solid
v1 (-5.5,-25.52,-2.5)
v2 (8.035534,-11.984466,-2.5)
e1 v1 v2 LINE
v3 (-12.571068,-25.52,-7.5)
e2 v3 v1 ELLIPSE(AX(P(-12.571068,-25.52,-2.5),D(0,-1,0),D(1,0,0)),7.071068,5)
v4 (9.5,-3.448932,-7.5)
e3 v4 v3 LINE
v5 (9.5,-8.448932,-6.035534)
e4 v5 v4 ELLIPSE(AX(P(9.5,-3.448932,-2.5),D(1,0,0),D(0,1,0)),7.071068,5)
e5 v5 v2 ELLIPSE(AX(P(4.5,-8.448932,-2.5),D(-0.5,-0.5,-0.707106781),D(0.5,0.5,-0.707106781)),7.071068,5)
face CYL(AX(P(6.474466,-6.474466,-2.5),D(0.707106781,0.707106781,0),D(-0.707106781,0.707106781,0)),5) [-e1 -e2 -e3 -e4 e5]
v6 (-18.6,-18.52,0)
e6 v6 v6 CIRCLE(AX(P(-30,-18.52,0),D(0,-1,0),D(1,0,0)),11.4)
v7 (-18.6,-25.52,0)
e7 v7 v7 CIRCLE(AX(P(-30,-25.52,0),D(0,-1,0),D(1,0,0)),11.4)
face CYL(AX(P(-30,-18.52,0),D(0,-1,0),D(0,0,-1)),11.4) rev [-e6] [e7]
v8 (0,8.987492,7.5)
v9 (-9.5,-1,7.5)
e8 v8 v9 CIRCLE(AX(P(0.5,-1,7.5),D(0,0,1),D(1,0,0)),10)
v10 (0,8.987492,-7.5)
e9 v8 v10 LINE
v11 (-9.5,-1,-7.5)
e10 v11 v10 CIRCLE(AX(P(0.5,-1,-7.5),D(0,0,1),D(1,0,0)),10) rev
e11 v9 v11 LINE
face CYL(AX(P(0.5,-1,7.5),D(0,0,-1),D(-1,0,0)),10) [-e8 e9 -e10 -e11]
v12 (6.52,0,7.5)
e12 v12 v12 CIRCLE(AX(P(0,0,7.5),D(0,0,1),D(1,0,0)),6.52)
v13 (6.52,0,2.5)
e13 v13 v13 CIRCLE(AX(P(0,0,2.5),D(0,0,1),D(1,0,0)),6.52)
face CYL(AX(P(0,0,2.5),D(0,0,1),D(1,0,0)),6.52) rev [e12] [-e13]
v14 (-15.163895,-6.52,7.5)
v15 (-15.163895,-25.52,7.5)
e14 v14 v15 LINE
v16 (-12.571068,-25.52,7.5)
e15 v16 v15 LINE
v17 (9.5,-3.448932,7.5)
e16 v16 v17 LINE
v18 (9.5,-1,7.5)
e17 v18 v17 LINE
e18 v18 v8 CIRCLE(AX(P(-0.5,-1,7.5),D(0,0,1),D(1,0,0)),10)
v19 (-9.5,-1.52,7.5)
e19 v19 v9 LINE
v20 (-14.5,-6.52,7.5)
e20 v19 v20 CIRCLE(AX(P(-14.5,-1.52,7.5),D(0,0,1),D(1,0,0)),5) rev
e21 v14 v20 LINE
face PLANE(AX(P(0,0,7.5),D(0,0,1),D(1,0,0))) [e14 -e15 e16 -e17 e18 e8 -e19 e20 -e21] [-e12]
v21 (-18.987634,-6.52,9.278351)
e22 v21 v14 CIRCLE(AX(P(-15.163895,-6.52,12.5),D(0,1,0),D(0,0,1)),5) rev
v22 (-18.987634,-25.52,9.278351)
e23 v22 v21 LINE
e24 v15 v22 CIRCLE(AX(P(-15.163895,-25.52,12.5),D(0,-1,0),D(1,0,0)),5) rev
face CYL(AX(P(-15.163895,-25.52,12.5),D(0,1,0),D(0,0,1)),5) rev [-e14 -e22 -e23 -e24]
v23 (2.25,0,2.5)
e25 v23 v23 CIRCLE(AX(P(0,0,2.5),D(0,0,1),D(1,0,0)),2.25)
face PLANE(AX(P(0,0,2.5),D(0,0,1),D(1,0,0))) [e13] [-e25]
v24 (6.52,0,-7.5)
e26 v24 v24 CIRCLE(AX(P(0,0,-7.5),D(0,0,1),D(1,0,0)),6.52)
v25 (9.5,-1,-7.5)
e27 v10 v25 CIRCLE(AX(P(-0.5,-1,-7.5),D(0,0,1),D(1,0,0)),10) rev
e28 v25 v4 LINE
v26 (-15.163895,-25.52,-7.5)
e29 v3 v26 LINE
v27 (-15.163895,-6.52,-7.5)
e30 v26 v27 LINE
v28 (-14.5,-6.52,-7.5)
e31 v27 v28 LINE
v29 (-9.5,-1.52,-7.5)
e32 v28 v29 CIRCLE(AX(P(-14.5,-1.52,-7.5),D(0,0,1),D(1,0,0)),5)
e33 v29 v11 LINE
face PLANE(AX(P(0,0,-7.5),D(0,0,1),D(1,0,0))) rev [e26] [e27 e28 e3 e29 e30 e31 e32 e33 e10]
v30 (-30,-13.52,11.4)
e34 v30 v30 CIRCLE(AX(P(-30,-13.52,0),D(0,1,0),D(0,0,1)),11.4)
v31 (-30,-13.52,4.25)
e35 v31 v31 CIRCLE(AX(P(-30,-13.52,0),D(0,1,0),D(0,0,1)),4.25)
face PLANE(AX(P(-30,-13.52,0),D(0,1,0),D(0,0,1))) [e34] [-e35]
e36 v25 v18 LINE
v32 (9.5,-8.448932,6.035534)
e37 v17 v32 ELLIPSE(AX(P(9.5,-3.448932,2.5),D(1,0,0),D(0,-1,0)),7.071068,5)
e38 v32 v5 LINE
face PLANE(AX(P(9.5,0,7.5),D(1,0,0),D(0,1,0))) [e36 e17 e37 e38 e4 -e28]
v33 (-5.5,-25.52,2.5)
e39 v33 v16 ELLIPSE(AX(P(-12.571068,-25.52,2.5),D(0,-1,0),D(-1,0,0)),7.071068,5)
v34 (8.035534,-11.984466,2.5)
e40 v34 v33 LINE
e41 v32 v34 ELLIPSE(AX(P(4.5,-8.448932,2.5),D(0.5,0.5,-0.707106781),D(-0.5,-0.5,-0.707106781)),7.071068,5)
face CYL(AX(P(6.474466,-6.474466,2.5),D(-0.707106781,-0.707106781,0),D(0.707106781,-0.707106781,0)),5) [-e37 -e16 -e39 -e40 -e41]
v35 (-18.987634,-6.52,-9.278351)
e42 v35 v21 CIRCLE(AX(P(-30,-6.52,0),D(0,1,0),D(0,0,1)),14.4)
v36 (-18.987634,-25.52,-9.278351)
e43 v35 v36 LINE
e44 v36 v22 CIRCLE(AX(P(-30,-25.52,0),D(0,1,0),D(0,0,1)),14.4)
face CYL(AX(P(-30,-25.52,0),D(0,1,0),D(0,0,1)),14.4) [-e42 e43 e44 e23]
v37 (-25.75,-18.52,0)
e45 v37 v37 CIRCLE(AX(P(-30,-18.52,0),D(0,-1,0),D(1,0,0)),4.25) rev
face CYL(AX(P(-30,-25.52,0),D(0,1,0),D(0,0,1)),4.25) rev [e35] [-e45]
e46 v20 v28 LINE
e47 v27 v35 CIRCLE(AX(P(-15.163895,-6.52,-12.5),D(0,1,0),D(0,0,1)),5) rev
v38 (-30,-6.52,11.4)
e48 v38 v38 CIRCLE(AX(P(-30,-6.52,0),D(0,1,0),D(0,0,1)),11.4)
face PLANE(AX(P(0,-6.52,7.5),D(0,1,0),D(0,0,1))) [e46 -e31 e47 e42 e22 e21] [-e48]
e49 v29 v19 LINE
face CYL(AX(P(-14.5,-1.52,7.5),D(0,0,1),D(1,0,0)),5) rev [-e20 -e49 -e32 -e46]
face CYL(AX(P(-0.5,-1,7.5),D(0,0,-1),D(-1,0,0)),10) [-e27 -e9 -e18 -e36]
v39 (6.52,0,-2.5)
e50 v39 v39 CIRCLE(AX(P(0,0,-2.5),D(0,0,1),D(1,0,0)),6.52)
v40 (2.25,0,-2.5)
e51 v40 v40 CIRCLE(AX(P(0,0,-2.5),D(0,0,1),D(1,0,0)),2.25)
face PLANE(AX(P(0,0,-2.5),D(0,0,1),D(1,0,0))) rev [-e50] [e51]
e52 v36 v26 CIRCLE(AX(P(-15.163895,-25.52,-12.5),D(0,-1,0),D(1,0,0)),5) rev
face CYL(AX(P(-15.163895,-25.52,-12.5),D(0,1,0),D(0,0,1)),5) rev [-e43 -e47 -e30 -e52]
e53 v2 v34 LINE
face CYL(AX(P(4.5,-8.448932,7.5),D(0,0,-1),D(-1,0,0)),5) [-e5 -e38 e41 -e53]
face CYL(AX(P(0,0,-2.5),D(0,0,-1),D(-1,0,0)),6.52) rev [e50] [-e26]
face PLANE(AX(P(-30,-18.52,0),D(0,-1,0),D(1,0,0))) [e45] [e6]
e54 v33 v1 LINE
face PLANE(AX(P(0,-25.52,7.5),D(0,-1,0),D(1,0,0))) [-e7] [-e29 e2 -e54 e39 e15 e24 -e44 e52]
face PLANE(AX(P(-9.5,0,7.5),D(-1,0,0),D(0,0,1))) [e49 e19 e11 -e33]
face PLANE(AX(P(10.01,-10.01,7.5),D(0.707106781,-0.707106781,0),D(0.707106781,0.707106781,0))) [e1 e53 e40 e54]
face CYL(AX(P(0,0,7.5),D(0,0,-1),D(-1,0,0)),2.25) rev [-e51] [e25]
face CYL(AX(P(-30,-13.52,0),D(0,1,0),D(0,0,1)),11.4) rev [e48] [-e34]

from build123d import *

# Parameters (mm, degrees)
SKETCH1_R               = 2.25
BOSS_EXTRUDE1_DEPTH     = 7.5
CUT_EXTRUDE1_START      = 7.5
SKETCH1_3_R             = 6.52
CUT_EXTRUDE1_DEPTH      = 5
CUT_EXTRUDE2_START      = -7.5
SKETCH1_4_R             = 6.52
CUT_EXTRUDE2_DEPTH      = 5
SKETCH2_R               = 14.4
BOSS_EXTRUDE2_DEPTH     = 19
CUT_EXTRUDE3_DEPTH      = 51.395634732
CUT_EXTRUDE3_DEPTH_BACK = 51.395634732
CUT_EXTRUDE4_DEPTH      = 7
CUT_EXTRUDE5_START      = -12
SKETCH2_5_R             = 11.4
CUT_EXTRUDE5_DEPTH      = 7
FILLET1_R               = 5
FILLET2_R               = 10
FILLET3_R               = 5


with BuildPart() as part:
    # Sketch1 → Boss-Extrude1 (new, symmetric)
    with BuildSketch(Plane.XY):
        Polygon((-9.5, 9), (9.5, 9), (9.5, -10.52), (-5.5, -25.52), (-30, -25.52), (-30, -6.52), (-9.5, -6.52), align=None)
        Circle(SKETCH1_R, mode=Mode.SUBTRACT)
    extrude(amount=BOSS_EXTRUDE1_DEPTH, both=True)

    # Sketch1<3> → Cut-Extrude1 (cut)
    with BuildSketch(Plane.XY.offset(CUT_EXTRUDE1_START)):
        Circle(SKETCH1_3_R)
    extrude(amount=-CUT_EXTRUDE1_DEPTH, mode=Mode.SUBTRACT)

    # Sketch1<4> → Cut-Extrude2 (cut)
    with BuildSketch(Plane.XY.offset(CUT_EXTRUDE2_START)):
        Circle(SKETCH1_4_R)
    extrude(amount=CUT_EXTRUDE2_DEPTH, mode=Mode.SUBTRACT)

    # Sketch2 → Boss-Extrude2 (add, through all)
    with BuildSketch(Plane(origin=(0, -6.52, 0), x_dir=(1, 0, 0), z_dir=(0, 1, 0))):
        with Locations((-30, 0)):
            Circle(SKETCH2_R)
    extrude(amount=-BOSS_EXTRUDE2_DEPTH)

    # Sketch2<3> → Cut-Extrude3 (cut, two sides: drawn at the far end of the back side and taken through both)
    with BuildSketch(Plane(origin=(0, -6.52, 0), x_dir=(1, 0, 0), z_dir=(0, 1, 0)).offset(-CUT_EXTRUDE3_DEPTH_BACK)):
        with BuildLine():
            ThreePointArc((-30, -4.25), (-26.99479618, -3.00520382), (-25.75, 0))
            ThreePointArc((-25.75, 0), (-26.99479618, 3.00520382), (-30, 4.25))
            Line((-30, 4.25), (-30, -4.25))
        make_face()
        with BuildLine():
            Line((-30, -4.25), (-30, 4.25))
            ThreePointArc((-30, 4.25), (-34.25, 0), (-30, -4.25))
        make_face()
    extrude(amount=CUT_EXTRUDE3_DEPTH + CUT_EXTRUDE3_DEPTH_BACK, mode=Mode.SUBTRACT)

    # Sketch2<4> → Cut-Extrude4 (cut)
    with BuildSketch(Plane(origin=(0, -6.52, 0), x_dir=(1, 0, 0), z_dir=(0, 1, 0))):
        with BuildLine():
            ThreePointArc((-21.414547187, -7.5), (-19.326805491, -4.005361278), (-18.6, 0))
            ThreePointArc((-18.6, 0), (-19.326805491, 4.005361278), (-21.414547187, 7.5))
            Line((-21.414547187, 7.5), (-30, 7.5))
            Line((-30, 7.5), (-30, 4.25))
            ThreePointArc((-30, 4.25), (-26.99479618, 3.00520382), (-25.75, 0))
            ThreePointArc((-25.75, 0), (-26.99479618, -3.00520382), (-30, -4.25))
            Line((-30, -4.25), (-30, -7.5))
            Line((-30, -7.5), (-21.414547187, -7.5))
        make_face()
        with BuildLine():
            Line((-30, 7.5), (-21.414547187, 7.5))
            ThreePointArc((-21.414547187, 7.5), (-41.4, 0), (-21.414547187, -7.5))
            Line((-21.414547187, -7.5), (-30, -7.5))
            Line((-30, -7.5), (-30, -4.25))
            ThreePointArc((-30, -4.25), (-34.25, 0), (-30, 4.25))
            Line((-30, 4.25), (-30, 7.5))
        make_face()
    extrude(amount=-CUT_EXTRUDE4_DEPTH, mode=Mode.SUBTRACT)

    # Sketch2<5> → Cut-Extrude5 (cut)
    with BuildSketch(Plane(origin=(0, -6.52, 0), x_dir=(1, 0, 0), z_dir=(0, 1, 0)).offset(CUT_EXTRUDE5_START)):
        with Locations(Location((-30, 0, 0), (0, 0, 270))):
            Circle(SKETCH2_5_R)
    extrude(amount=-CUT_EXTRUDE5_DEPTH, mode=Mode.SUBTRACT)

    # Fillet1
    fillet1_edges = [part.edges().sort_by_distance(p)[0] for p in [
        (-9.5, -6.52, 0),
        (-17.707319251, -16.02, -7.5),
        (-17.707319251, -16.02, 7.5),
    ]]
    fillet(fillet1_edges, radius=FILLET1_R)

    # Fillet2
    # the kernel refuses this fillet: 10 mm, written as the material it takes off along each edge
    with BuildSketch(Plane(origin=(-9.5, 9, -32.5), x_dir=(0, -1, 0), z_dir=(0, 0, 1))) as fillet2_piece_1:
        with BuildLine():
            CenterArc((FILLET2_R, FILLET2_R), FILLET2_R, 180, 90)
            Line((0, FILLET2_R), (0, 0))
            Line((0, 0), (FILLET2_R, 0))
        make_face()
    extrude(amount=65, mode=Mode.SUBTRACT)
    with BuildSketch(Plane(origin=(9.5, 9, 32.5), x_dir=(-1, 0, 0), z_dir=(0, 0, -1))) as fillet2_piece_2:
        with BuildLine():
            CenterArc((FILLET2_R, -FILLET2_R), FILLET2_R, 90, 90)
            Line((0, -FILLET2_R), (0, 0))
            Line((0, 0), (FILLET2_R, 0))
        make_face()
    extrude(amount=65, mode=Mode.SUBTRACT)

    # Fillet3
    fillet3_edges = [part.edges().sort_by_distance(p)[0] for p in [
        (2, -18.02, -7.5),
        (9.5, -10.52, 0),
        (2, -18.02, 7.5),
    ]]
    fillet(fillet3_edges, radius=FILLET3_R)


solid = part.part
